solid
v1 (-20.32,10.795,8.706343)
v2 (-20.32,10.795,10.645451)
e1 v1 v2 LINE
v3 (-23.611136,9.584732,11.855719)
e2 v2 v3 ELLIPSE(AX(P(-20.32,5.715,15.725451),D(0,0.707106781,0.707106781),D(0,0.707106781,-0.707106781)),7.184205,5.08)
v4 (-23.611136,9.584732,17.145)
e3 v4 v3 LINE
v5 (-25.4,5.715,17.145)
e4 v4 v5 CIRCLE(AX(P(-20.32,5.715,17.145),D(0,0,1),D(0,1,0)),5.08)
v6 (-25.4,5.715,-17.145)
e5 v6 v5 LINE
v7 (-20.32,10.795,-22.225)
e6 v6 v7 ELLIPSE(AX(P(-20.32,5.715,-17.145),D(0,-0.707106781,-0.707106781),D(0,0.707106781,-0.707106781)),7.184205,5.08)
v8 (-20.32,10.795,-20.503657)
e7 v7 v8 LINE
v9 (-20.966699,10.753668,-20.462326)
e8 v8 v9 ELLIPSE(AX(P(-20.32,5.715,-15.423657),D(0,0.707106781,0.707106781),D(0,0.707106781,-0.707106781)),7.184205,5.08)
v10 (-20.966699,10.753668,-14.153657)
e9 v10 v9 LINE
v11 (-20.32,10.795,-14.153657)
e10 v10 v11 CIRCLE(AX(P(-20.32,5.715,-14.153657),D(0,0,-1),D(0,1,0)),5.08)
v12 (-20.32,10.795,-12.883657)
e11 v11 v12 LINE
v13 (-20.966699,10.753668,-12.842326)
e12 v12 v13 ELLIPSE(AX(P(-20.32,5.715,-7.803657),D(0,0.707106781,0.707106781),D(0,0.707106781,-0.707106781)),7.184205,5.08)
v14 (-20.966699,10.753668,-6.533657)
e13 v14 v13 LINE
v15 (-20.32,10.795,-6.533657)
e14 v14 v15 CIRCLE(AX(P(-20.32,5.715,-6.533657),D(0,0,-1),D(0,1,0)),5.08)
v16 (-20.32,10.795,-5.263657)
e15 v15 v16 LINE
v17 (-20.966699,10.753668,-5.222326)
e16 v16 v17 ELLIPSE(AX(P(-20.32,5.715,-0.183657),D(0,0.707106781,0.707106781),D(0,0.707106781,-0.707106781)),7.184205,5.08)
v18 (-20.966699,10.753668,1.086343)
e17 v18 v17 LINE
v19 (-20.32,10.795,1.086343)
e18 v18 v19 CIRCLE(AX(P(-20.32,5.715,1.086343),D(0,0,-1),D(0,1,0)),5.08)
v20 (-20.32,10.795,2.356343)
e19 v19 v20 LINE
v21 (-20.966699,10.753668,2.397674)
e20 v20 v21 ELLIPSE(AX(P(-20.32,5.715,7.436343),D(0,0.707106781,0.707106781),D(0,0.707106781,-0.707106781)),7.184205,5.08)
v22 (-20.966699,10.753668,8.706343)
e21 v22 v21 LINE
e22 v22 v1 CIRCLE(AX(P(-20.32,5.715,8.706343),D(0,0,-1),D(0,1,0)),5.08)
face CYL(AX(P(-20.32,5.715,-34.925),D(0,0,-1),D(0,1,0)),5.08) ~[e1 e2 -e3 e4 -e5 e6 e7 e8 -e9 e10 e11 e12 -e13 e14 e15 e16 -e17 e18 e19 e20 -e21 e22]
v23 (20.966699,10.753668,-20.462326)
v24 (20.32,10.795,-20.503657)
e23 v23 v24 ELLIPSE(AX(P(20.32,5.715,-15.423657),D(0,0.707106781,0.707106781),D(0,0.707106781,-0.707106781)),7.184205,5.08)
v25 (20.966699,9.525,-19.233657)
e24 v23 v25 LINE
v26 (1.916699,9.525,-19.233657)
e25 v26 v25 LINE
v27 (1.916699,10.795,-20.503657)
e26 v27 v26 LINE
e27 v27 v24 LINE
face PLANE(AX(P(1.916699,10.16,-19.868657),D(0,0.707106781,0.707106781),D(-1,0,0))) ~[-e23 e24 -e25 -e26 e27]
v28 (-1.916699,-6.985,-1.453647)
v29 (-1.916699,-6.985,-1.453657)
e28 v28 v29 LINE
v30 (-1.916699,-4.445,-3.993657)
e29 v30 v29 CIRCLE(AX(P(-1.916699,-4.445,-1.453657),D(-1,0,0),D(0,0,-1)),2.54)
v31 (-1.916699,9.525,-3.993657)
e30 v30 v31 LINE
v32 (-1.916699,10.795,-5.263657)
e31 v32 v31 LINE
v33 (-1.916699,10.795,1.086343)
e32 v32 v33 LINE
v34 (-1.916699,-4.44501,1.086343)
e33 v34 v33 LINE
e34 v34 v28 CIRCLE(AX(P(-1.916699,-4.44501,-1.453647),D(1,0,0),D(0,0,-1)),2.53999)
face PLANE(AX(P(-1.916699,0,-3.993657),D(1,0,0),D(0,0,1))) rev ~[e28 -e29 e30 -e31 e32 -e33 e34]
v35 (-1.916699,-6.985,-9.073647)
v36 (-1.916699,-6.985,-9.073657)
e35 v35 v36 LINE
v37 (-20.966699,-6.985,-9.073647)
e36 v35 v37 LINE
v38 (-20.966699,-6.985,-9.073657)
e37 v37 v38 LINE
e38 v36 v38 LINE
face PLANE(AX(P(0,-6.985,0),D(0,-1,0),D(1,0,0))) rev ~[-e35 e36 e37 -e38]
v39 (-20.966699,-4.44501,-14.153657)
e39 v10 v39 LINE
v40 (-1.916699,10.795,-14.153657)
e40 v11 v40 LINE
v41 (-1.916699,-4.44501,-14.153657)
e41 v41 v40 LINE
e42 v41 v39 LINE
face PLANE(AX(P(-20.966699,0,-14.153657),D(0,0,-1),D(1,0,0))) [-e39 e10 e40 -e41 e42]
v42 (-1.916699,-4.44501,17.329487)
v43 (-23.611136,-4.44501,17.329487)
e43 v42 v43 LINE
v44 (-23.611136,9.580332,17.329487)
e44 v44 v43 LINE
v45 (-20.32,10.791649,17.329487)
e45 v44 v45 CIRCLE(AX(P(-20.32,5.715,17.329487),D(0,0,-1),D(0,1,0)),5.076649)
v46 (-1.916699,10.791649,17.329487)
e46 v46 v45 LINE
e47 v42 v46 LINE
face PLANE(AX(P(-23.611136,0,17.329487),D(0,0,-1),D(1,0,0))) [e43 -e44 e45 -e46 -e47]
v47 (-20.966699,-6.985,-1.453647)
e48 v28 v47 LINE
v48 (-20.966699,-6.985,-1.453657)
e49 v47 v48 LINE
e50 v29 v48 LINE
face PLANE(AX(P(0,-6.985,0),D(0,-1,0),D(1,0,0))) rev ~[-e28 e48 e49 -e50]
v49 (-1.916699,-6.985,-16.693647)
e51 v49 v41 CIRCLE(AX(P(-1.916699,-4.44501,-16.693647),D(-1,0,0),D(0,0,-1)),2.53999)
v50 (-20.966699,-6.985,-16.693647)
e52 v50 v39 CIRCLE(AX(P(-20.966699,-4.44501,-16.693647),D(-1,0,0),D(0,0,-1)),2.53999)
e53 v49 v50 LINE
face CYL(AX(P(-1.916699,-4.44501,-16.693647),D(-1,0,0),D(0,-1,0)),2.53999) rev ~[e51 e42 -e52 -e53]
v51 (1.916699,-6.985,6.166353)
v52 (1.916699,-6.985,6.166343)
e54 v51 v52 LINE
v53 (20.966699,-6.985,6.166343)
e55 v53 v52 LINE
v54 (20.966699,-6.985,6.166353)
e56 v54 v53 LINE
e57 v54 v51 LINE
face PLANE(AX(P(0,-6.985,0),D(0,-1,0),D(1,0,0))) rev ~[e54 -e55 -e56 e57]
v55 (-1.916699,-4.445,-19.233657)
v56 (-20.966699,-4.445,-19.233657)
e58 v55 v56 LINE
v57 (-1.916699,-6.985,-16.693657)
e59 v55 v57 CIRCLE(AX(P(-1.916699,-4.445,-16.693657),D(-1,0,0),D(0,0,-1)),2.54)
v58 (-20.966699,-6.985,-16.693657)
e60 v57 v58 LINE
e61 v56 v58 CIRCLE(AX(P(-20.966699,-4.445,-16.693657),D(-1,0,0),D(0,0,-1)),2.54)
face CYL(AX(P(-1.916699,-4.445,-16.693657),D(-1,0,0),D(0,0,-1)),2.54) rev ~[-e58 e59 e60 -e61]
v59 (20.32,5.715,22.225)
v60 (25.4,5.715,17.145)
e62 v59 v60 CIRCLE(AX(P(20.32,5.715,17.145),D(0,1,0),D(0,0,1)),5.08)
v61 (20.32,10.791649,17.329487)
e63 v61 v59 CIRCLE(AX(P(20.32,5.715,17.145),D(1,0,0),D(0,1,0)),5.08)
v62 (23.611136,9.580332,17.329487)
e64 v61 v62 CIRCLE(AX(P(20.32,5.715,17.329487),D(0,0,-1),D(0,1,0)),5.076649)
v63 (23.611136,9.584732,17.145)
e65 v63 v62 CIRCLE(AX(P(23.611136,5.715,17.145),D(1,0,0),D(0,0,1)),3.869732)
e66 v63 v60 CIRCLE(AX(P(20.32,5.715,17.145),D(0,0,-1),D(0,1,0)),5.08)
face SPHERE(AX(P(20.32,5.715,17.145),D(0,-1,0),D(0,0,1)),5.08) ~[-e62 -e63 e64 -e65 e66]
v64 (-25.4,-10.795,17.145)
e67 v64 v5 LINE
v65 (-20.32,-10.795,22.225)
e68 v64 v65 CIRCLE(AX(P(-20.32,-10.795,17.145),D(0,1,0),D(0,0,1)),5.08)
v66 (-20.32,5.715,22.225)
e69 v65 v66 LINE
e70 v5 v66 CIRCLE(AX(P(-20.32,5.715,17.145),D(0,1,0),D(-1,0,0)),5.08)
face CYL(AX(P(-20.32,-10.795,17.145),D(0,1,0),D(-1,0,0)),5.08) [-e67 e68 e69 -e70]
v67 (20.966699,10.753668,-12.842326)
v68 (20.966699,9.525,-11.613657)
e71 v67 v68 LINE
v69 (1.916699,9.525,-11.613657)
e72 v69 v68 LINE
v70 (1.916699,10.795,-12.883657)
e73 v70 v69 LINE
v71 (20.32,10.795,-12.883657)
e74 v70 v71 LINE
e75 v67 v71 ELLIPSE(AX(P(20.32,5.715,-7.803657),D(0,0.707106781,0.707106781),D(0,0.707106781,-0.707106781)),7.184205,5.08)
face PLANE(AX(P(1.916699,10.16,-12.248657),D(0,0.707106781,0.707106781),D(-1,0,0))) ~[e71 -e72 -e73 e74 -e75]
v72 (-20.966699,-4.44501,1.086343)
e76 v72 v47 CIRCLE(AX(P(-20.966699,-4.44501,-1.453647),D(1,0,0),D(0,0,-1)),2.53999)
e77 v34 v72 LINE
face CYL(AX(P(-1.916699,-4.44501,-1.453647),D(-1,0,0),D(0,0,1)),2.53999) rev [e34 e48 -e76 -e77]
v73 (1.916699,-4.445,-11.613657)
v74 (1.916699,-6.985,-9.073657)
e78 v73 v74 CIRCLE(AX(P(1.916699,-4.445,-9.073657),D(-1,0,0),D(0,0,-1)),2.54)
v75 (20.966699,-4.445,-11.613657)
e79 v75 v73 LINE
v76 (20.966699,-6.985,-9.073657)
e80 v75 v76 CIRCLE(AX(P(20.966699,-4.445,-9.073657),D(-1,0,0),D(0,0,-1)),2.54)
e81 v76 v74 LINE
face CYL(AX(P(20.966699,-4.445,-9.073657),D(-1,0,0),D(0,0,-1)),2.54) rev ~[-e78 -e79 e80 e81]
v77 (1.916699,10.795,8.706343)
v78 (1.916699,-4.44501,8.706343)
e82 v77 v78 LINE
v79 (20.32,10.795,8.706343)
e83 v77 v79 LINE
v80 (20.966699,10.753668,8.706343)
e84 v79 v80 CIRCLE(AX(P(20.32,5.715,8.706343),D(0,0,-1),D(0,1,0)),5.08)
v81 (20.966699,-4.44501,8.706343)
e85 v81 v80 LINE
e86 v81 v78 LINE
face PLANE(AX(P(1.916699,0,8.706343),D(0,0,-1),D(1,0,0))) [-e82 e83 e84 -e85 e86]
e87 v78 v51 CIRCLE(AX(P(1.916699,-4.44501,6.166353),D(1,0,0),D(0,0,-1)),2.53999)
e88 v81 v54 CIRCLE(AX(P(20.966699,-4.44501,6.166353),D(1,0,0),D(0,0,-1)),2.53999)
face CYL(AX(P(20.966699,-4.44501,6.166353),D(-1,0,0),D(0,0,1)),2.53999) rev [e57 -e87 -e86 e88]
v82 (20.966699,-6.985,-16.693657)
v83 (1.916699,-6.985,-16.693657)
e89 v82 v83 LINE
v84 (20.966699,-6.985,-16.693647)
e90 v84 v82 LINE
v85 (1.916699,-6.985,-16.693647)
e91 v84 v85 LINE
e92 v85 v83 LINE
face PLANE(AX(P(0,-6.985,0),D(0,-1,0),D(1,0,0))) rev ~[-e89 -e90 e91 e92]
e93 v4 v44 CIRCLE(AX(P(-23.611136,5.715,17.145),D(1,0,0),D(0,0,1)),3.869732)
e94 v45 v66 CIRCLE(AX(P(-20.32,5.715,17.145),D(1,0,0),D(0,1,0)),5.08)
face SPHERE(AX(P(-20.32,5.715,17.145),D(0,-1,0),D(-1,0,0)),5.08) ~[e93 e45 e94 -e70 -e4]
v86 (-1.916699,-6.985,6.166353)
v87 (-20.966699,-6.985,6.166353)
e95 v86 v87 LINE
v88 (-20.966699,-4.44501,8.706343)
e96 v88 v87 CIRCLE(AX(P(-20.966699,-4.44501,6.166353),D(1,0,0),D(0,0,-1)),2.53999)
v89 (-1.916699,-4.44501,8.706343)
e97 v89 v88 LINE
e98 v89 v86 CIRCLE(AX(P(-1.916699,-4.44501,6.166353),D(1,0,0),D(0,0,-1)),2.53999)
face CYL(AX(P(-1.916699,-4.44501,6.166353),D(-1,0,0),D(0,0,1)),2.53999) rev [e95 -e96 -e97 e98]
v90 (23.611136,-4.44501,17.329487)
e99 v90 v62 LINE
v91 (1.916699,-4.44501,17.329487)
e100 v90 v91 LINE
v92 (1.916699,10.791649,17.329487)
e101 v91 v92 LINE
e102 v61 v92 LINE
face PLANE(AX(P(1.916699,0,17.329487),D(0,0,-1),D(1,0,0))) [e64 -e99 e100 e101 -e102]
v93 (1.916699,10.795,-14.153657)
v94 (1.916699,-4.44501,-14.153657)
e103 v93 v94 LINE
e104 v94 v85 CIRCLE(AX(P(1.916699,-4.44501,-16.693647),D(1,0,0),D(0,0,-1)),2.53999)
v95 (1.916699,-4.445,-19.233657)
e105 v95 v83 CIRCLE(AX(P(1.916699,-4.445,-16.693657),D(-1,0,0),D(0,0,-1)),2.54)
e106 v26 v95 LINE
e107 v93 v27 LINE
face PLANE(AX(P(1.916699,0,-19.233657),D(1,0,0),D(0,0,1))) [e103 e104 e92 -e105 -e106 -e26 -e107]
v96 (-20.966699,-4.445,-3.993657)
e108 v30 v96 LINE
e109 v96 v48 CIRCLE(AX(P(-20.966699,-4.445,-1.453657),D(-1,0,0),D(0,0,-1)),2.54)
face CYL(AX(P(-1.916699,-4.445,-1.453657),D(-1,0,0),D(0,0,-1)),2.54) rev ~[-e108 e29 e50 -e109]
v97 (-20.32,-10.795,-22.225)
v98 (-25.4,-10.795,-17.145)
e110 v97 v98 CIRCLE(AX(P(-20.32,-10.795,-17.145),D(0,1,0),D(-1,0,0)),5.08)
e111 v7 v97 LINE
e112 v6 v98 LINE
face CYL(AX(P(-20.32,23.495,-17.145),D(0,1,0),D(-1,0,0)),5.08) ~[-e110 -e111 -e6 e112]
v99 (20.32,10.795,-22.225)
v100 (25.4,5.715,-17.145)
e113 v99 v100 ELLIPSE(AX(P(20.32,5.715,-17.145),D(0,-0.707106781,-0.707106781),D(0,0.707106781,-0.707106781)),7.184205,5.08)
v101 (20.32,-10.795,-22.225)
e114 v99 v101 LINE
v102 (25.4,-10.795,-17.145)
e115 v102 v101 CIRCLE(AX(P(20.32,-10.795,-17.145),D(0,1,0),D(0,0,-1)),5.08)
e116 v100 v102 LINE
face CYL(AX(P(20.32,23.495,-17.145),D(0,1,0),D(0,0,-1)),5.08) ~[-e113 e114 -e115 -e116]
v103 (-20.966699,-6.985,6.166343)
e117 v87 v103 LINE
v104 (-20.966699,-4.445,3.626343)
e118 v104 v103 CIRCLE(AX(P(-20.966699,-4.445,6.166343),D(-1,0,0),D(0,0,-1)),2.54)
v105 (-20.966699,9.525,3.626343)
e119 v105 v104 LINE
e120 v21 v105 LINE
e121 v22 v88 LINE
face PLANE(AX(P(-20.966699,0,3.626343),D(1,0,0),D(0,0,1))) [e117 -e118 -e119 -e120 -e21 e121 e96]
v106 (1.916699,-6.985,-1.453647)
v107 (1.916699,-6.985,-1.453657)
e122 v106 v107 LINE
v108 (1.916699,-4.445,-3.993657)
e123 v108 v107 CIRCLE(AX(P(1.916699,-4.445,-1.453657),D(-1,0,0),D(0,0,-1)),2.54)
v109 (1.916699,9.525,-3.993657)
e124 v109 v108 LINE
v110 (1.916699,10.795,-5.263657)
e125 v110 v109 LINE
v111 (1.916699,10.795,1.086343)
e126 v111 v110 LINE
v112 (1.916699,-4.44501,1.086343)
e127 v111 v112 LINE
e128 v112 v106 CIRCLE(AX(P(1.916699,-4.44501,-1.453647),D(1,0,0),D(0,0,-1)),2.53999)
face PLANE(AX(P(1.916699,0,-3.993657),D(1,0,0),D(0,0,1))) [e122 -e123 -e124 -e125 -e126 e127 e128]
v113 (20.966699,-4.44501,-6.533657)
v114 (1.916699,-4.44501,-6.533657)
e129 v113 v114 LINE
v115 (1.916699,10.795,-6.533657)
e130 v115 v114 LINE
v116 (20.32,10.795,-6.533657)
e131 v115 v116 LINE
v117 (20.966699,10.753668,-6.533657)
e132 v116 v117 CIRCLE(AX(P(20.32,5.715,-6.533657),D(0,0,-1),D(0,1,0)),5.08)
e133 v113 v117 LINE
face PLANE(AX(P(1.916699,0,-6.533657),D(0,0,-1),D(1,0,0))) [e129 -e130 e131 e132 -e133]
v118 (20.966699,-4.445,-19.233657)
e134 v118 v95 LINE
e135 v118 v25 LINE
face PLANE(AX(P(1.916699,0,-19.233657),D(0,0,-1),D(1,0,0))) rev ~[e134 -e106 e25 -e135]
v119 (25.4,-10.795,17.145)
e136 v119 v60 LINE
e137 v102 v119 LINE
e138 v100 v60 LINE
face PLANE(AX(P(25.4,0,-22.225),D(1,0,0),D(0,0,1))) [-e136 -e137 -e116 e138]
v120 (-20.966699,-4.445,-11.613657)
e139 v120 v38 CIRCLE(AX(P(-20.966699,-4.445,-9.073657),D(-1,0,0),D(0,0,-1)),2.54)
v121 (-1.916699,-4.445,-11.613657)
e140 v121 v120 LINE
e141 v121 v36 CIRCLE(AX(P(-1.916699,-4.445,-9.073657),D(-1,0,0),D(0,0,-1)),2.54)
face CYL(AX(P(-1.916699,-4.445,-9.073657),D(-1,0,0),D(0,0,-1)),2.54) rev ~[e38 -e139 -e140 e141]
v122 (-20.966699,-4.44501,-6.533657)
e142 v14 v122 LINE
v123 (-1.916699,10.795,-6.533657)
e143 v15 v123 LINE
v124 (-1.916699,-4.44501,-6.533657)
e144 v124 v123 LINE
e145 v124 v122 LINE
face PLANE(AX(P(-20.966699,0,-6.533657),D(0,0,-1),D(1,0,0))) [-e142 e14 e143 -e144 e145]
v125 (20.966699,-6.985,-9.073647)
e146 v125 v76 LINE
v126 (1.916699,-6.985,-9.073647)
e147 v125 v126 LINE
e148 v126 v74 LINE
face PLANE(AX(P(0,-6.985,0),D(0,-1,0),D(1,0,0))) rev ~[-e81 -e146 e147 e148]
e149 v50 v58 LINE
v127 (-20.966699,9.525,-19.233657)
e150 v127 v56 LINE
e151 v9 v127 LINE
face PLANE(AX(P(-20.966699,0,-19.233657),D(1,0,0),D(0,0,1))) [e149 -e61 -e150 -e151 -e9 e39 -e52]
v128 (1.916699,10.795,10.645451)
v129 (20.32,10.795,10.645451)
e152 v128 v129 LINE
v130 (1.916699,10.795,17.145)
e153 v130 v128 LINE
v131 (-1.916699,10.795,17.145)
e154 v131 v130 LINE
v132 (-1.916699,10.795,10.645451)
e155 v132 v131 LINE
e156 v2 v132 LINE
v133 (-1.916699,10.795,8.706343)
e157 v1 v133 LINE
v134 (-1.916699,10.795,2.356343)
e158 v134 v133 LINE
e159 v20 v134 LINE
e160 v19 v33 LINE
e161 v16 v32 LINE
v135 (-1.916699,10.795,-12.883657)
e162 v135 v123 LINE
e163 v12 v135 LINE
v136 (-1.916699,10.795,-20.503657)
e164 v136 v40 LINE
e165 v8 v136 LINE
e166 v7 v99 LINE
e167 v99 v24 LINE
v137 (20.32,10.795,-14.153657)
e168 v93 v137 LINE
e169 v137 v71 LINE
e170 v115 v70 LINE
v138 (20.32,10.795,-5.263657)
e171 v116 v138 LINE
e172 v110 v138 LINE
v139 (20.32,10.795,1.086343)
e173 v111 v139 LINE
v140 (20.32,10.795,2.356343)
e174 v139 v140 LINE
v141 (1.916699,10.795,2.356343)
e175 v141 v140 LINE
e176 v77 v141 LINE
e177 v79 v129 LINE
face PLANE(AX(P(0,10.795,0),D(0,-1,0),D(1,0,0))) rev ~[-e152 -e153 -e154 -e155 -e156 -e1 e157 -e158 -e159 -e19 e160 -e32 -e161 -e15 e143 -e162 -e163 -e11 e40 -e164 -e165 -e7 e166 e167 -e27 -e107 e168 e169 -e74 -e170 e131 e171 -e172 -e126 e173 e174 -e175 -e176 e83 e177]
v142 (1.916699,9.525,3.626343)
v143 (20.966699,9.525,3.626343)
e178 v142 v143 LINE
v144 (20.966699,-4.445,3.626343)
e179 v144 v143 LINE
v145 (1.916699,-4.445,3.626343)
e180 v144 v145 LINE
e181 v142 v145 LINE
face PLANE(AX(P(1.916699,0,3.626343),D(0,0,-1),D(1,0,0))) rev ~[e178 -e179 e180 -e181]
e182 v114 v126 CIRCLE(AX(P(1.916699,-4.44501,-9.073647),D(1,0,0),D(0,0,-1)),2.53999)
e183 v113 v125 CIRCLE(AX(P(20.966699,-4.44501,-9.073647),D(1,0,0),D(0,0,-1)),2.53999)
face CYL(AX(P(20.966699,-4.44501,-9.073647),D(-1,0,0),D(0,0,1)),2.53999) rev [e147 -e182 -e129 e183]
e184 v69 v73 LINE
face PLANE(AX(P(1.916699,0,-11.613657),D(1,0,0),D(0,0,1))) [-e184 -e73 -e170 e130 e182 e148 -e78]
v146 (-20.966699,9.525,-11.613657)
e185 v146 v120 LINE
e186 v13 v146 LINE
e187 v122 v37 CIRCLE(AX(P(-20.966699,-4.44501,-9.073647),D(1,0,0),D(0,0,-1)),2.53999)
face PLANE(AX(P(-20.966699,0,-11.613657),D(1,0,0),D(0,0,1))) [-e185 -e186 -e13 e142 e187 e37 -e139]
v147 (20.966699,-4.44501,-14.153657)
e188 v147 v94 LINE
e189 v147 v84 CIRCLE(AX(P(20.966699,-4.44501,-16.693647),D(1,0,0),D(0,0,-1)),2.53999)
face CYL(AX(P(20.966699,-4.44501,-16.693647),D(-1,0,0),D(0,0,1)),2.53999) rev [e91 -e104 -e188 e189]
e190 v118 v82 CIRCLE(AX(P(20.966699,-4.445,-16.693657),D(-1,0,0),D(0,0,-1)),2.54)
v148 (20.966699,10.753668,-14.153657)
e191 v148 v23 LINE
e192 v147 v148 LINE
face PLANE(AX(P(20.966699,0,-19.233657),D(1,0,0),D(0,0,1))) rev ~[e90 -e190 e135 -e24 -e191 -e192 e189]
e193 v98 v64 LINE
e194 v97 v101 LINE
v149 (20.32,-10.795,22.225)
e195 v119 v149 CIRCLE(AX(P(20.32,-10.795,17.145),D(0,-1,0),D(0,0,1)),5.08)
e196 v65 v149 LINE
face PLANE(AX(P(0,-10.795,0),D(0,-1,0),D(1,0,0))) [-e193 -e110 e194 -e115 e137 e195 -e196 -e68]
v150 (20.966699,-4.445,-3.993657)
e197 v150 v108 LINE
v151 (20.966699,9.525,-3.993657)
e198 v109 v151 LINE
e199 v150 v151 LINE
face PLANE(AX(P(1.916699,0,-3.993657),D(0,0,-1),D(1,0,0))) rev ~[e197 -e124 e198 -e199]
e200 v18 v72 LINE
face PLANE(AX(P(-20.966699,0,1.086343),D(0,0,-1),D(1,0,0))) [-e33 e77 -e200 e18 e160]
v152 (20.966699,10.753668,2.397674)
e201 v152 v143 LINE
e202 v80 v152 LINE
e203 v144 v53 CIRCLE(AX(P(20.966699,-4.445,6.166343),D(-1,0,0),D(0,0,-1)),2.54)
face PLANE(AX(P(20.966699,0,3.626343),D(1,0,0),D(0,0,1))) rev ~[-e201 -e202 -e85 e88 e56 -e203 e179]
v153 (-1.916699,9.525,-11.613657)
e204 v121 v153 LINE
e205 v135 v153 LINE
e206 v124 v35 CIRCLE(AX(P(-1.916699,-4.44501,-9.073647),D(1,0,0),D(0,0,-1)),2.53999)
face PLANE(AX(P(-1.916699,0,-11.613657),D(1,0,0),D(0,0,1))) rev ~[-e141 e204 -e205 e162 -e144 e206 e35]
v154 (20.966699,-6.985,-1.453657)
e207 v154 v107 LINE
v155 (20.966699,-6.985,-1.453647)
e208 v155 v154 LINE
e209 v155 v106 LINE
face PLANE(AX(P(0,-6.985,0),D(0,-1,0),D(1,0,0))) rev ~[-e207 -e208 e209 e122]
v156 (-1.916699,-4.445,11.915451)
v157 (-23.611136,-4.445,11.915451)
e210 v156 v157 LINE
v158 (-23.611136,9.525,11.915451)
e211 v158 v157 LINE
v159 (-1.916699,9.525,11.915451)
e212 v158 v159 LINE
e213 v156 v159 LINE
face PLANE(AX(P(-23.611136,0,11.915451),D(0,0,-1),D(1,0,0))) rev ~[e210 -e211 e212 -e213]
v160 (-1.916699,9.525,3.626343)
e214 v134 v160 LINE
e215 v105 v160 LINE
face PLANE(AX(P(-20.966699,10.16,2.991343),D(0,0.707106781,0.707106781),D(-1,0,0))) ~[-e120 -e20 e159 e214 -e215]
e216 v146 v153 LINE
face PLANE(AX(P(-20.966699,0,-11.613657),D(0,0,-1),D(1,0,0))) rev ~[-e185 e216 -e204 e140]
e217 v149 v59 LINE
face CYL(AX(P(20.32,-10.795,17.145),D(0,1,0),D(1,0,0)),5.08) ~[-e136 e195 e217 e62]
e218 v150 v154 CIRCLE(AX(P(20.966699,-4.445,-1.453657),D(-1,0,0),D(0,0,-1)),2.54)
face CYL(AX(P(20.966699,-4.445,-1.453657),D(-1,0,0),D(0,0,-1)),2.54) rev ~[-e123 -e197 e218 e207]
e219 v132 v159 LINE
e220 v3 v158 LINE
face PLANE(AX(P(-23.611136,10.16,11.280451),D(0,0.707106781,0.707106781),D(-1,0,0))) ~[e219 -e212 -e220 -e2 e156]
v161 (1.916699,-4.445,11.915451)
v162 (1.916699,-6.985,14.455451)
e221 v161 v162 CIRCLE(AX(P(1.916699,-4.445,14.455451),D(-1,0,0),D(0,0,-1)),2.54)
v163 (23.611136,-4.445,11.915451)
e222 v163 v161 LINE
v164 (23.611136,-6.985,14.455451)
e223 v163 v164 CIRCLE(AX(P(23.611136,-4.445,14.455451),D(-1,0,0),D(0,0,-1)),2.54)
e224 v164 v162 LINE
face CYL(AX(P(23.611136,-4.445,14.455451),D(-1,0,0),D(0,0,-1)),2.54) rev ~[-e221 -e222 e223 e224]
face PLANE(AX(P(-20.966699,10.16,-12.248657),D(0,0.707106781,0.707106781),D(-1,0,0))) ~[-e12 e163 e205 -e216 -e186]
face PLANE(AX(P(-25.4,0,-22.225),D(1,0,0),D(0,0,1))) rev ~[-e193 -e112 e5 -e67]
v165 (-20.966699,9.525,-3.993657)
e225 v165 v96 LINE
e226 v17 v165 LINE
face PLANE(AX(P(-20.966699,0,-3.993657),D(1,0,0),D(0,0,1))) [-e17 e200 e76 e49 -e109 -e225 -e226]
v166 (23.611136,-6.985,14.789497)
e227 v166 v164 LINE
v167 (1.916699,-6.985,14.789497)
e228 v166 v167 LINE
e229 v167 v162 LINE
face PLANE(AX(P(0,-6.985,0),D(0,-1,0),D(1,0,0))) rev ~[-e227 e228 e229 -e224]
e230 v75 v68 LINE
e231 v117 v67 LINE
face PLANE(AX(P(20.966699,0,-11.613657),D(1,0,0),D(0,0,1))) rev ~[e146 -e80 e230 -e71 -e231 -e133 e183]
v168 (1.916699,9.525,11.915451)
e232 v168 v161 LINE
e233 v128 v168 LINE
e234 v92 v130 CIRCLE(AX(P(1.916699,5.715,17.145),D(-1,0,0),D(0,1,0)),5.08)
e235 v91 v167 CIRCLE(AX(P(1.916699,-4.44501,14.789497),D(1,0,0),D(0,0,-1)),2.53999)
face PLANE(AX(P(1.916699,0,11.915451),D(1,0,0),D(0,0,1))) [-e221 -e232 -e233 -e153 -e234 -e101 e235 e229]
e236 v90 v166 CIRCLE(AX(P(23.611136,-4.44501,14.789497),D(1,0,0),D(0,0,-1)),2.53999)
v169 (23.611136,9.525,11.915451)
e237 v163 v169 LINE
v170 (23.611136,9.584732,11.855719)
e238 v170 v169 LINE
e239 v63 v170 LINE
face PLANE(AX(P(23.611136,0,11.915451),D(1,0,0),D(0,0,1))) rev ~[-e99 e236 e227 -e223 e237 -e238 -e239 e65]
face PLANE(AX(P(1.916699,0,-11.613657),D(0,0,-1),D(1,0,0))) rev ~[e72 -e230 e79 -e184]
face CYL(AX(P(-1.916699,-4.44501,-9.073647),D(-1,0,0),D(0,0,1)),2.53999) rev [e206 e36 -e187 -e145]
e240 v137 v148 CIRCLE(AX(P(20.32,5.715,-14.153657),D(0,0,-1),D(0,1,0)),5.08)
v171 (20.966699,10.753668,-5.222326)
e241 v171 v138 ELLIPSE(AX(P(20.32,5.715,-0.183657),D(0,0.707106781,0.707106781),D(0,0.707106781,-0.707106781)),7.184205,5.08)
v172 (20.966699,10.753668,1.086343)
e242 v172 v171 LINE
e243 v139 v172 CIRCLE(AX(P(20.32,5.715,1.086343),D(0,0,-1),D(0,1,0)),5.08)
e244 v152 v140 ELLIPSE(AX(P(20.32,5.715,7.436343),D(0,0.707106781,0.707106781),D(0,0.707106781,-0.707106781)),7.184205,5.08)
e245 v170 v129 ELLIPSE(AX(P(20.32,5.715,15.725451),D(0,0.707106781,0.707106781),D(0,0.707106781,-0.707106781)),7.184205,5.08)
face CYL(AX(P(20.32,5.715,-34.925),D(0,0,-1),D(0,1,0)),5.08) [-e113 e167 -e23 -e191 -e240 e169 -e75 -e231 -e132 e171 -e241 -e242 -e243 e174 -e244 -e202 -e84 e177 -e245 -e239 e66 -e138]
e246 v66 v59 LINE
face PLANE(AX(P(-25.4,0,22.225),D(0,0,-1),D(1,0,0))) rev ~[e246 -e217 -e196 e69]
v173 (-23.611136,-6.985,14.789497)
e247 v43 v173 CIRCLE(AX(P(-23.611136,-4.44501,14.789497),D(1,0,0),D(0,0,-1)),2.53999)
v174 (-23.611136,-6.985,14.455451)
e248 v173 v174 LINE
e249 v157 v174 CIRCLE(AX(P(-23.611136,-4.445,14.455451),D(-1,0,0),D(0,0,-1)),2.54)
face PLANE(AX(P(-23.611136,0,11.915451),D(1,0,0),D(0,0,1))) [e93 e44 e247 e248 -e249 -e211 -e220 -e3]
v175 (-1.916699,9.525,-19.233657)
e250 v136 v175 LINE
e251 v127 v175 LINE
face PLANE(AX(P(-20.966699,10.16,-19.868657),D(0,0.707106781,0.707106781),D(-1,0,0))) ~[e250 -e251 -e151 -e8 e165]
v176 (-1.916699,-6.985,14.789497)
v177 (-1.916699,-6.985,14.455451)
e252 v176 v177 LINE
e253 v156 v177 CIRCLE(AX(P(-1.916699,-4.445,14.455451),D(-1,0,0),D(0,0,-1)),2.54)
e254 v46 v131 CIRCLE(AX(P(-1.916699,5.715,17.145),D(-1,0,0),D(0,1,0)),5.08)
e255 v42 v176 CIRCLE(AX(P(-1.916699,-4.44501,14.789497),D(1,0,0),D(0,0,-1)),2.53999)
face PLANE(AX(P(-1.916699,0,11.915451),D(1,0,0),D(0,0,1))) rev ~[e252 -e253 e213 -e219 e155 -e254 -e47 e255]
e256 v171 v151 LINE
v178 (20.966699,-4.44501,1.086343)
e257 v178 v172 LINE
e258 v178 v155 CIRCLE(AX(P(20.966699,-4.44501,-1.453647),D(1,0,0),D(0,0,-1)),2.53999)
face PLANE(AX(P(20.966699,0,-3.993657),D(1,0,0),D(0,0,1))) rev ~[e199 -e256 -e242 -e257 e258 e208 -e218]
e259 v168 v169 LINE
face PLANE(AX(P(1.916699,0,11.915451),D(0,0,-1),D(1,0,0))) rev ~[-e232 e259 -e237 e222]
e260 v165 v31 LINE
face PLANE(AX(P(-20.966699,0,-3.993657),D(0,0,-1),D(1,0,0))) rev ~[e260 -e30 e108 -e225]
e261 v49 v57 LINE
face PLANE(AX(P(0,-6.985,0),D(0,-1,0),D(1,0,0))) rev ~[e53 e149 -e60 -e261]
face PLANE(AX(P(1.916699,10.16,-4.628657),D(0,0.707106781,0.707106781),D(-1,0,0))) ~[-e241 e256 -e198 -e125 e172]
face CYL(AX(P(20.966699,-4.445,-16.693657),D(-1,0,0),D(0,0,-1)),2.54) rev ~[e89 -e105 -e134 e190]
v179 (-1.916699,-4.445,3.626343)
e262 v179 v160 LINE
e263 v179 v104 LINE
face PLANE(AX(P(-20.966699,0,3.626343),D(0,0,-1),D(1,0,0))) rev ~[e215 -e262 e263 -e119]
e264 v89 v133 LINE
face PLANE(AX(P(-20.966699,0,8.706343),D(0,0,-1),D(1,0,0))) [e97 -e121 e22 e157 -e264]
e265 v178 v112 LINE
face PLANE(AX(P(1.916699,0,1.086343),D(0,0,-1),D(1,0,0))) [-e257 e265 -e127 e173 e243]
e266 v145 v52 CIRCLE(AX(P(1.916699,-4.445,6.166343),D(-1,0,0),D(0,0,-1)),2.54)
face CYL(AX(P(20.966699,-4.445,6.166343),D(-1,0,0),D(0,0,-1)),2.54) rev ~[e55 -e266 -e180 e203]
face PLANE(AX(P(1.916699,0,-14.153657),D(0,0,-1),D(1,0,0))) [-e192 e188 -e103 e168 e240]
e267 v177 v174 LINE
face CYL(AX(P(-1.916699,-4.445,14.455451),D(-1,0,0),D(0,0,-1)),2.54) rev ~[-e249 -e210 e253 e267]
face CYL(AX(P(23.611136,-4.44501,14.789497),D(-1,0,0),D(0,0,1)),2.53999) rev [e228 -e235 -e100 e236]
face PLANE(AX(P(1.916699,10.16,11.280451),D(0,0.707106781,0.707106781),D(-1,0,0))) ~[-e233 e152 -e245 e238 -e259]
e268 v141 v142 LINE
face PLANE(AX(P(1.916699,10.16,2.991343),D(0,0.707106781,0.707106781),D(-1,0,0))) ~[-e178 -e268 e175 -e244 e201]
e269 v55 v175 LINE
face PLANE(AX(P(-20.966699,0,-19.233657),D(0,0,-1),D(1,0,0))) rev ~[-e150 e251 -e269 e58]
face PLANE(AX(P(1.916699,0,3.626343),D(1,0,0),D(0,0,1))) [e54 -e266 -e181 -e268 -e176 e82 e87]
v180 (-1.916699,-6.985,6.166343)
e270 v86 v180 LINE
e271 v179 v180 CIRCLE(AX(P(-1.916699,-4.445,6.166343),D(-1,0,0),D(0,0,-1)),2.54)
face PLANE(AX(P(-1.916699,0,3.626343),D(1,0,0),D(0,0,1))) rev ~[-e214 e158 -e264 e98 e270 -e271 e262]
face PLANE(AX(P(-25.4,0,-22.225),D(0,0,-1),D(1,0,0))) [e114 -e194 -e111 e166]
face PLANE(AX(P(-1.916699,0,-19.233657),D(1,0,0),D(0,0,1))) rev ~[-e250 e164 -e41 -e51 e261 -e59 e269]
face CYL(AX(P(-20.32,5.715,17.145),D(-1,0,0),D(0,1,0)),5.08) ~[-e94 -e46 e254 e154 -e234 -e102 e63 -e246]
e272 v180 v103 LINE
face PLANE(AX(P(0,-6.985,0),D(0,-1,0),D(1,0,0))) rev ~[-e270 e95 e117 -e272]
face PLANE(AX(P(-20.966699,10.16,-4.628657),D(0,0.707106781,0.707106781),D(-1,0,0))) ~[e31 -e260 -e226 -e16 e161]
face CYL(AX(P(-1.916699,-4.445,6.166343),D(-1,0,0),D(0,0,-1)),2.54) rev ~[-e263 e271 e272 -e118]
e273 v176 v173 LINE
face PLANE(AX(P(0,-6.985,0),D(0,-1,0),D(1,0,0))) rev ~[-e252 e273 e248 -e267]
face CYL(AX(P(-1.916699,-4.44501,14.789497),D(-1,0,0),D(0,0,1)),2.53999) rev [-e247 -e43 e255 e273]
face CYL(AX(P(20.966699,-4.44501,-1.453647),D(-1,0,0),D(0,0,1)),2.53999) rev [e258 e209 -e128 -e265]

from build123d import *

# Parameters (mm, degrees)
F0_W         = 50.8
F0_H         = 44.45
F0_W_2       = 19.05
F0_H_2       = 5.08
F0_W_3       = 21.6944364339
F0_H_3       = 5.4140361476
F1_DEPTH     = 10.795
F2_W         = 50.8
F2_H         = 44.45
F3_DEPTH     = 3.81
F4_R         = 5.08
F5_SIZE      = 1.27
F6_R         = 2.54
F7_R         = 2.53999
F8_T1_DEPTH  = 52.07
F8_T3_DEPTH  = 46.99
F8_T5_DEPTH  = 40.64
F8_T8_ANGLE  = 90
F8_T10_ANGLE = 90


# Not quite as in the source:
# - a fillet or chamfer that OpenCascade refuses, or shapes differently, is made with other operations: its cross-section is extruded or revolved along the edge and cut away or added
# - a fillet or chamfer is up to 0.001 mm smaller than in the source, because OpenCascade refuses the exact size


with BuildPart() as f1:
    # F0 (on Front) → F1 (new body, symmetric)
    with BuildSketch(Plane.XZ):
        Rectangle(F0_W, F0_H)
        with Locations((-11.4416993469, -16.6936574811)):
            Rectangle(F0_W_2, F0_H_2, mode=Mode.SUBTRACT)
        with Locations((-11.4416993469, -9.0736574811)):
            Rectangle(F0_W_2, F0_H_2, mode=Mode.SUBTRACT)
        with Locations((-11.4416993469, -1.4536574811)):
            Rectangle(F0_W_2, F0_H_2, mode=Mode.SUBTRACT)
        with Locations((11.4416993469, -16.6936574811)):
            Rectangle(F0_W_2, F0_H_2, mode=Mode.SUBTRACT)
        with Locations((11.4416993469, -9.0736574811)):
            Rectangle(F0_W_2, F0_H_2, mode=Mode.SUBTRACT)
        with Locations((11.4416993469, -1.4536574811)):
            Rectangle(F0_W_2, F0_H_2, mode=Mode.SUBTRACT)
        with Locations((-11.4416993469, 6.1663425189)):
            Rectangle(F0_W_2, F0_H_2, mode=Mode.SUBTRACT)
        with Locations((-12.7639175639, 14.6224689895)):
            Rectangle(F0_W_3, F0_H_3, mode=Mode.SUBTRACT)
        with Locations((11.4416993469, 6.1663425189)):
            Rectangle(F0_W_2, F0_H_2, mode=Mode.SUBTRACT)
        with Locations((12.7639175639, 14.6224689895)):
            Rectangle(F0_W_3, F0_H_3, mode=Mode.SUBTRACT)
    extrude(amount=F1_DEPTH, both=True)

    # F2 (on face) → F3 (join)
    with BuildSketch(Plane.XZ.offset(10.795)):
        Rectangle(F2_W, F2_H)
    extrude(amount=-F3_DEPTH)

    # F4
    f4_edges = [f1.edges().sort_by_distance(p)[0] for p in [
        (25.4, 0, 22.225),
        (-25.4, 0, 22.225),
    ]]
    fillet(f4_edges, radius=F4_R)

    # F5
    f5_edges = [f1.edges().sort_by_distance(p)[0] for p in [
        (12.763918, 10.795, 11.915451),
        (-12.763918, 10.795, 11.915451),
        (-11.441699, 10.795, 3.626343),
        (11.441699, 10.795, 3.626343),
        (11.441699, 10.795, -3.993657),
        (-11.441699, 10.795, -3.993657),
        (-11.441699, 10.795, -11.613657),
        (11.441699, 10.795, -11.613657),
        (11.441699, 10.795, -19.233657),
        (-11.441699, 10.795, -19.233657),
    ]]
    chamfer(f5_edges, length=F5_SIZE)

    # F6
    f6_edges = [f1.edges().sort_by_distance(p)[0] for p in [
        (11.441699, -6.985, 3.626343),
        (-11.441699, -6.985, 3.626343),
        (-12.763918, -6.985, 11.915451),
        (12.763918, -6.985, 11.915451),
        (11.441699, -6.985, -3.993657),
        (-11.441699, -6.985, -3.993657),
        (11.441699, -6.985, -11.613657),
        (-11.441699, -6.985, -11.613657),
        (11.441699, -6.985, -19.233657),
        (-11.441699, -6.985, -19.233657),
    ]]
    fillet(f6_edges, radius=F6_R)

    # F7 (radius 2.54 in the source; OpenCascade refuses exactly that, so slightly less here)
    f7_edges = [f1.edges().sort_by_distance(p)[0] for p in [
        (11.441699, -6.985, 1.086343),
        (11.441699, -6.985, 8.706343),
        (-11.441699, -6.985, 8.706343),
        (-11.441699, -6.985, 1.086343),
        (-11.441699, -6.985, -6.533657),
        (11.441699, -6.985, -6.533657),
        (-12.763918, -6.985, 17.329487),
        (12.763918, -6.985, 17.329487),
        (11.441699, -6.985, -14.153657),
        (-11.441699, -6.985, -14.153657),
    ]]
    fillet(f7_edges, radius=F7_R)

    # F8: fillet of radius 5.08 on 4 edges, made by hand

    # F8_s2 → F8_t1 (cut)
    with BuildSketch(Plane.XY.offset(-34.925)):
        with BuildLine():
            ThreePointArc((20.32, 10.795), (23.9121024484, 9.3071024484), (25.4, 5.715))
            Line((25.4, 5.715), (25.4, 10.795))
            Line((25.4, 10.795), (20.32, 10.795))
        make_face()
        with BuildLine():
            ThreePointArc((-20.32, 10.795), (-23.9121024484, 9.3071024484), (-25.4, 5.715))
            Line((-25.4, 5.715), (-25.4, 10.795))
            Line((-25.4, 10.795), (-20.32, 10.795))
        make_face()
    extrude(amount=F8_T1_DEPTH, mode=Mode.SUBTRACT)

    # F8_s4 → F8_t3 (cut)
    with BuildSketch(Plane.XZ.offset(-23.495)):
        with BuildLine():
            ThreePointArc((-25.4, -17.145), (-23.9121024484, -20.7371024484), (-20.32, -22.225))
            Line((-20.32, -22.225), (-25.4, -22.225))
            Line((-25.4, -22.225), (-25.4, -17.145))
        make_face()
        with BuildLine():
            ThreePointArc((20.32, -22.225), (23.9121024484, -20.7371024484), (25.4, -17.145))
            Line((25.4, -17.145), (25.4, -22.225))
            Line((25.4, -22.225), (20.32, -22.225))
        make_face()
    extrude(amount=F8_T3_DEPTH, mode=Mode.SUBTRACT)

    # F8_s6 → F8_t5 (cut)
    with BuildSketch(Plane.YZ.offset(-20.32)):
        with BuildLine():
            ThreePointArc((10.795, 17.145), (9.3071024484, 20.7371024484), (5.715, 22.225))
            Line((5.715, 22.225), (10.795, 22.225))
            Line((10.795, 22.225), (10.795, 17.145))
        make_face()
    extrude(amount=F8_T5_DEPTH, mode=Mode.SUBTRACT)

    # F8_s7 → F8_t8 (revolve, cut)
    with BuildSketch(Plane.XY.offset(17.145)):
        with BuildLine():
            ThreePointArc((-20.32, 10.795), (-23.9121024484, 9.3071024484), (-25.4, 5.715))
            Line((-25.4, 5.715), (-25.4, 10.795))
            Line((-25.4, 10.795), (-20.32, 10.795))
        make_face()
    revolve(axis=Axis((-20.32, 10.795, 17.145), (0, 1, 0)), revolution_arc=F8_T8_ANGLE, mode=Mode.SUBTRACT)

    # F8_s9 → F8_t10 (revolve, cut)
    with BuildSketch(Plane.YZ.offset(20.32)):
        with BuildLine():
            ThreePointArc((10.795, 17.145), (9.3071024484, 20.7371024484), (5.715, 22.225))
            Line((5.715, 22.225), (10.795, 22.225))
            Line((10.795, 22.225), (10.795, 17.145))
        make_face()
    revolve(axis=Axis((20.32, 10.795, 17.145), (0, 1, 0)), revolution_arc=F8_T10_ANGLE, mode=Mode.SUBTRACT)


solid = f1.part
